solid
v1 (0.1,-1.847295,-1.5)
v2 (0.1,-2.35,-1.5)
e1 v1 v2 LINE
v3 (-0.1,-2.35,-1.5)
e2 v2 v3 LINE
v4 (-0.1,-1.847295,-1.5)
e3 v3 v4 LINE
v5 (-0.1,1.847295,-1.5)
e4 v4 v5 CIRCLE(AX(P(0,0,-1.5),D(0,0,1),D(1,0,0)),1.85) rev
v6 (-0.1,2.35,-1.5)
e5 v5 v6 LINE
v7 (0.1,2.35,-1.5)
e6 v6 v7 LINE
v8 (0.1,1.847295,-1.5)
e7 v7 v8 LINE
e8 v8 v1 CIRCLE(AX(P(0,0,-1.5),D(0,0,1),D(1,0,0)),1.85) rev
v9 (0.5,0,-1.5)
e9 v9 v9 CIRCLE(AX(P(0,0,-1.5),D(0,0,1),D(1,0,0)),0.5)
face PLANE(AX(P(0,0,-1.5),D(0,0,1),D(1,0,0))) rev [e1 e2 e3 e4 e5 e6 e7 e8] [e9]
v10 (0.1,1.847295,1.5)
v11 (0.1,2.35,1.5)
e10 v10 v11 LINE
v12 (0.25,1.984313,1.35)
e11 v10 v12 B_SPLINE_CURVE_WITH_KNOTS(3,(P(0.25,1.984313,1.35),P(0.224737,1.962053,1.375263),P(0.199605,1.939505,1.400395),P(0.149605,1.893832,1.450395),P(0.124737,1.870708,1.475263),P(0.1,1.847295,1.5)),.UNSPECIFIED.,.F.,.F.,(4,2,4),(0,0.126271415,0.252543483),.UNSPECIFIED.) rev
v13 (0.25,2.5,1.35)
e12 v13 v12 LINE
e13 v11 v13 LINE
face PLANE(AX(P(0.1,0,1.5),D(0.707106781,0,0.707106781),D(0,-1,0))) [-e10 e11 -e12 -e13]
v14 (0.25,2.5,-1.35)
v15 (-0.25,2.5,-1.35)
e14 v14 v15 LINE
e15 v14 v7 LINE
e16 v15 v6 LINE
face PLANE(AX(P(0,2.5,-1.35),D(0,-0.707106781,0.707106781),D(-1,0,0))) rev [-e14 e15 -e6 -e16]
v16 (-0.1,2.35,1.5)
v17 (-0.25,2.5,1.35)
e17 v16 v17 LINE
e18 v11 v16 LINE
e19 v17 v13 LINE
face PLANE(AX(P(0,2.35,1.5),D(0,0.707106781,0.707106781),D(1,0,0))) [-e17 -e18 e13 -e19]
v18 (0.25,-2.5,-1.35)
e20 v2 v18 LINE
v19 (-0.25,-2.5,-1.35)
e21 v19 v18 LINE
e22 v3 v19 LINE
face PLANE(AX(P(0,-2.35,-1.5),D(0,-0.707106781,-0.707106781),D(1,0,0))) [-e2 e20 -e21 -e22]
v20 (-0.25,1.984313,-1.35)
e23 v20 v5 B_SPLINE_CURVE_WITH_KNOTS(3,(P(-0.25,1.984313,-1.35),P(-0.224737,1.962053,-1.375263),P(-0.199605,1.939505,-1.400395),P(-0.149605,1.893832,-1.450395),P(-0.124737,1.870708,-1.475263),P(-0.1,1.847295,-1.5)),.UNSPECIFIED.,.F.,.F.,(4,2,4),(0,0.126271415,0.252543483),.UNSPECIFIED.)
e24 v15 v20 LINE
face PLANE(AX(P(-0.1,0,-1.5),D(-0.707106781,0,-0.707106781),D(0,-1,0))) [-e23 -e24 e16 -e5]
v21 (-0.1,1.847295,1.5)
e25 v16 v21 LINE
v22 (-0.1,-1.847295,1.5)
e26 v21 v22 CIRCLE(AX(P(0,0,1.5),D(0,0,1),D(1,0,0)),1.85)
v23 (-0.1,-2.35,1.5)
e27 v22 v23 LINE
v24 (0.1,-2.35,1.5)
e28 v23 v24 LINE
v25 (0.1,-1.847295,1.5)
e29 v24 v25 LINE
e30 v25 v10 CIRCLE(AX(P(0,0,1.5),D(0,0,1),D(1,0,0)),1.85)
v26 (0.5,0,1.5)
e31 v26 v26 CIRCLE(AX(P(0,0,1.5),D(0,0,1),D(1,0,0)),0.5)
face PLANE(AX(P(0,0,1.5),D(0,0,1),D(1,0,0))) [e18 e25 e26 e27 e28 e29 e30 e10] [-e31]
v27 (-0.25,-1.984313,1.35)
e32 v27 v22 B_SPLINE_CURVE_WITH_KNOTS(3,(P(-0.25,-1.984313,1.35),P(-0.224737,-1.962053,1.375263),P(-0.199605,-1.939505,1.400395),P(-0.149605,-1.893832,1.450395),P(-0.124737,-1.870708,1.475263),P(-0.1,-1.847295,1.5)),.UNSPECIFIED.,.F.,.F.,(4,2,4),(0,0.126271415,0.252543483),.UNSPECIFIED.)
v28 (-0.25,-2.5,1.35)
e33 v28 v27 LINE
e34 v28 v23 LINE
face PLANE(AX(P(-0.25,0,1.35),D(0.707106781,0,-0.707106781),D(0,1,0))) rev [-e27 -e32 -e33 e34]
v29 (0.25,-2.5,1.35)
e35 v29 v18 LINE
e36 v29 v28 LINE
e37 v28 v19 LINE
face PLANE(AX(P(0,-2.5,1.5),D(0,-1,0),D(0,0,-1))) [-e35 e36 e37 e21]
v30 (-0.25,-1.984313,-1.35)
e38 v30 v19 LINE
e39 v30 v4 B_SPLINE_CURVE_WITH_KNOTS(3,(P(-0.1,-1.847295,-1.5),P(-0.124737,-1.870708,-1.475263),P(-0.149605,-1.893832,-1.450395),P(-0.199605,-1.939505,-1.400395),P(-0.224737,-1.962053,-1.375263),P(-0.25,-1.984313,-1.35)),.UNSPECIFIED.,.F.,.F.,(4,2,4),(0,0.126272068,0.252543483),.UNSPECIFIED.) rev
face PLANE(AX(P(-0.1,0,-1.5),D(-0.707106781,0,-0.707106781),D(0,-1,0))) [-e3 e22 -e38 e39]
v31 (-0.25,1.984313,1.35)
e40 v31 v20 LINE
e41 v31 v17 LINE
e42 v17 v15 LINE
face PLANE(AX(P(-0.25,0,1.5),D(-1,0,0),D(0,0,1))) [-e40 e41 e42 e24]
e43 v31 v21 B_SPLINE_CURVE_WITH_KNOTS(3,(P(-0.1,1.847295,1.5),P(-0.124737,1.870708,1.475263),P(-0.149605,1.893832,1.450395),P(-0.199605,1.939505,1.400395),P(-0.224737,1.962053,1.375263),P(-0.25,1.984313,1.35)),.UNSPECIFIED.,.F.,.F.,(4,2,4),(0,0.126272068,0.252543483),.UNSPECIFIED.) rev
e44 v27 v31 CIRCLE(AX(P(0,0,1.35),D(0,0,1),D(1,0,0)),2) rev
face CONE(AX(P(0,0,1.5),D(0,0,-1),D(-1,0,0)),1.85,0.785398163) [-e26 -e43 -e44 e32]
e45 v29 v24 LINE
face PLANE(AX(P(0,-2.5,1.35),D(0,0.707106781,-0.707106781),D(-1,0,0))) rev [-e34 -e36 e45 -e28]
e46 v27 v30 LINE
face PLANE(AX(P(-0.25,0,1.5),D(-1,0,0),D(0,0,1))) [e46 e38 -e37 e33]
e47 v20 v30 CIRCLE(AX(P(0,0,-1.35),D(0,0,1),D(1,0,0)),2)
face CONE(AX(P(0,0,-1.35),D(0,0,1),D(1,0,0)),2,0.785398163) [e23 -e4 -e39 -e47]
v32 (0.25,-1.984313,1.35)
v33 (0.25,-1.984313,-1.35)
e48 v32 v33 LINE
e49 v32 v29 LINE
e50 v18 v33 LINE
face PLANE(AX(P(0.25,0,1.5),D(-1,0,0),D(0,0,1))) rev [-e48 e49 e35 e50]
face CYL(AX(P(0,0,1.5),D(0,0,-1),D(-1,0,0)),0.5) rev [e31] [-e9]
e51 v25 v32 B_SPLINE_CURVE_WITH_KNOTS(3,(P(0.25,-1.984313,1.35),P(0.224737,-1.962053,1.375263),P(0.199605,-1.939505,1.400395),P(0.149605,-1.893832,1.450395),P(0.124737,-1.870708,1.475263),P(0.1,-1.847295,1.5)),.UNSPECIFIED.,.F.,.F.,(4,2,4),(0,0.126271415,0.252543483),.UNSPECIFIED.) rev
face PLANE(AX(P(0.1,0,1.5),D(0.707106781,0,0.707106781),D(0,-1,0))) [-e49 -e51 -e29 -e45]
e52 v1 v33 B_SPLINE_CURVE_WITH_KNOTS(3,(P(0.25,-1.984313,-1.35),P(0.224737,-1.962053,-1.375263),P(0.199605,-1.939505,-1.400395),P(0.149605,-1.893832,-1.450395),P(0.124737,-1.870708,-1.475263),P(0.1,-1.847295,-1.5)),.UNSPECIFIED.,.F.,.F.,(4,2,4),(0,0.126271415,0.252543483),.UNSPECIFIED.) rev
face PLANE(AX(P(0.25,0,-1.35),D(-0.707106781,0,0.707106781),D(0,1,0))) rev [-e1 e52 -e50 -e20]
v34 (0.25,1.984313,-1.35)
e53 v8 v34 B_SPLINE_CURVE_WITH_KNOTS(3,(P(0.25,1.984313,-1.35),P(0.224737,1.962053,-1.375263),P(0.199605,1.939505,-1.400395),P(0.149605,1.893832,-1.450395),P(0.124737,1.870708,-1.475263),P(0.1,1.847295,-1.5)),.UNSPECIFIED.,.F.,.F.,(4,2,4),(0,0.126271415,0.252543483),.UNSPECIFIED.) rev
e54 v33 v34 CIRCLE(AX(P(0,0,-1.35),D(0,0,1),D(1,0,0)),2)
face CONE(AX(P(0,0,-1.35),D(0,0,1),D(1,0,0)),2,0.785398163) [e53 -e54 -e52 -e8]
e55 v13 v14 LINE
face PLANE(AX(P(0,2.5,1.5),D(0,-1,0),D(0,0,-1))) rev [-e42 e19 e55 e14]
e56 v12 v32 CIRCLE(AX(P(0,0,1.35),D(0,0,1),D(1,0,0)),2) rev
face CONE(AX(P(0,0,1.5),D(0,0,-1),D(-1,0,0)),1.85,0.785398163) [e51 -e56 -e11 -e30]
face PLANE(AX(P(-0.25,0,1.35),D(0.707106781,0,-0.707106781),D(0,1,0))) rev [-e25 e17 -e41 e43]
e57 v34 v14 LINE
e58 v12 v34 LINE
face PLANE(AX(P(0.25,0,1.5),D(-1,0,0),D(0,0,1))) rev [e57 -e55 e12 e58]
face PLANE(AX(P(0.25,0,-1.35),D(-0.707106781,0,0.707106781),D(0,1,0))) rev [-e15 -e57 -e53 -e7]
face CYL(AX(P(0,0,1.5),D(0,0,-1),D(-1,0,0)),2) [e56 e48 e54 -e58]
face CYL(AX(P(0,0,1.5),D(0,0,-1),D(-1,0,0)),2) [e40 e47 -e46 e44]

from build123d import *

# Parameters (mm, degrees)
SKETCH1_R           = 0.5
BOSS_EXTRUDE1_DEPTH = 1.5
CHAMFER1_SIZE       = 0.15


with BuildPart() as part:
    # Sketch1 → Boss-Extrude1 (new, symmetric)
    with BuildSketch(Plane.XY):
        with BuildLine():
            Line((-0.25, -2.5), (0.25, -2.5))
            Line((0.25, -2.5), (0.25, -1.984313483))
            ThreePointArc((0.25, -1.984313483), (2, 0), (0.25, 1.984313483))
            Line((0.25, 1.984313483), (0.25, 2.5))
            Line((0.25, 2.5), (-0.25, 2.5))
            Line((-0.25, 2.5), (-0.25, 1.984313483))
            ThreePointArc((-0.25, 1.984313483), (-2, 0), (-0.25, -1.984313483))
            Line((-0.25, -1.984313483), (-0.25, -2.5))
        make_face()
        Circle(SKETCH1_R, mode=Mode.SUBTRACT)
    extrude(amount=BOSS_EXTRUDE1_DEPTH, both=True)

    # Chamfer1
    chamfer1_edges = [part.edges().sort_by_distance(p)[0] for p in [
        (-0.25, -2.242156742, -1.5),
        (0, -2.5, -1.5),
        (0.25, -2.242156742, -1.5),
        (2, 0, -1.5),
        (0.25, 2.242156742, -1.5),
        (0, 2.5, -1.5),
        (-0.25, 2.242156742, -1.5),
        (-2, 0, -1.5),
        (-0.25, 2.242156742, 1.5),
        (0, 2.5, 1.5),
        (0.25, 2.242156742, 1.5),
        (2, 0, 1.5),
        (0.25, -2.242156742, 1.5),
        (0, -2.5, 1.5),
        (-0.25, -2.242156742, 1.5),
        (-2, 0, 1.5),
    ]]
    chamfer(chamfer1_edges, length=CHAMFER1_SIZE)


solid = part.part
